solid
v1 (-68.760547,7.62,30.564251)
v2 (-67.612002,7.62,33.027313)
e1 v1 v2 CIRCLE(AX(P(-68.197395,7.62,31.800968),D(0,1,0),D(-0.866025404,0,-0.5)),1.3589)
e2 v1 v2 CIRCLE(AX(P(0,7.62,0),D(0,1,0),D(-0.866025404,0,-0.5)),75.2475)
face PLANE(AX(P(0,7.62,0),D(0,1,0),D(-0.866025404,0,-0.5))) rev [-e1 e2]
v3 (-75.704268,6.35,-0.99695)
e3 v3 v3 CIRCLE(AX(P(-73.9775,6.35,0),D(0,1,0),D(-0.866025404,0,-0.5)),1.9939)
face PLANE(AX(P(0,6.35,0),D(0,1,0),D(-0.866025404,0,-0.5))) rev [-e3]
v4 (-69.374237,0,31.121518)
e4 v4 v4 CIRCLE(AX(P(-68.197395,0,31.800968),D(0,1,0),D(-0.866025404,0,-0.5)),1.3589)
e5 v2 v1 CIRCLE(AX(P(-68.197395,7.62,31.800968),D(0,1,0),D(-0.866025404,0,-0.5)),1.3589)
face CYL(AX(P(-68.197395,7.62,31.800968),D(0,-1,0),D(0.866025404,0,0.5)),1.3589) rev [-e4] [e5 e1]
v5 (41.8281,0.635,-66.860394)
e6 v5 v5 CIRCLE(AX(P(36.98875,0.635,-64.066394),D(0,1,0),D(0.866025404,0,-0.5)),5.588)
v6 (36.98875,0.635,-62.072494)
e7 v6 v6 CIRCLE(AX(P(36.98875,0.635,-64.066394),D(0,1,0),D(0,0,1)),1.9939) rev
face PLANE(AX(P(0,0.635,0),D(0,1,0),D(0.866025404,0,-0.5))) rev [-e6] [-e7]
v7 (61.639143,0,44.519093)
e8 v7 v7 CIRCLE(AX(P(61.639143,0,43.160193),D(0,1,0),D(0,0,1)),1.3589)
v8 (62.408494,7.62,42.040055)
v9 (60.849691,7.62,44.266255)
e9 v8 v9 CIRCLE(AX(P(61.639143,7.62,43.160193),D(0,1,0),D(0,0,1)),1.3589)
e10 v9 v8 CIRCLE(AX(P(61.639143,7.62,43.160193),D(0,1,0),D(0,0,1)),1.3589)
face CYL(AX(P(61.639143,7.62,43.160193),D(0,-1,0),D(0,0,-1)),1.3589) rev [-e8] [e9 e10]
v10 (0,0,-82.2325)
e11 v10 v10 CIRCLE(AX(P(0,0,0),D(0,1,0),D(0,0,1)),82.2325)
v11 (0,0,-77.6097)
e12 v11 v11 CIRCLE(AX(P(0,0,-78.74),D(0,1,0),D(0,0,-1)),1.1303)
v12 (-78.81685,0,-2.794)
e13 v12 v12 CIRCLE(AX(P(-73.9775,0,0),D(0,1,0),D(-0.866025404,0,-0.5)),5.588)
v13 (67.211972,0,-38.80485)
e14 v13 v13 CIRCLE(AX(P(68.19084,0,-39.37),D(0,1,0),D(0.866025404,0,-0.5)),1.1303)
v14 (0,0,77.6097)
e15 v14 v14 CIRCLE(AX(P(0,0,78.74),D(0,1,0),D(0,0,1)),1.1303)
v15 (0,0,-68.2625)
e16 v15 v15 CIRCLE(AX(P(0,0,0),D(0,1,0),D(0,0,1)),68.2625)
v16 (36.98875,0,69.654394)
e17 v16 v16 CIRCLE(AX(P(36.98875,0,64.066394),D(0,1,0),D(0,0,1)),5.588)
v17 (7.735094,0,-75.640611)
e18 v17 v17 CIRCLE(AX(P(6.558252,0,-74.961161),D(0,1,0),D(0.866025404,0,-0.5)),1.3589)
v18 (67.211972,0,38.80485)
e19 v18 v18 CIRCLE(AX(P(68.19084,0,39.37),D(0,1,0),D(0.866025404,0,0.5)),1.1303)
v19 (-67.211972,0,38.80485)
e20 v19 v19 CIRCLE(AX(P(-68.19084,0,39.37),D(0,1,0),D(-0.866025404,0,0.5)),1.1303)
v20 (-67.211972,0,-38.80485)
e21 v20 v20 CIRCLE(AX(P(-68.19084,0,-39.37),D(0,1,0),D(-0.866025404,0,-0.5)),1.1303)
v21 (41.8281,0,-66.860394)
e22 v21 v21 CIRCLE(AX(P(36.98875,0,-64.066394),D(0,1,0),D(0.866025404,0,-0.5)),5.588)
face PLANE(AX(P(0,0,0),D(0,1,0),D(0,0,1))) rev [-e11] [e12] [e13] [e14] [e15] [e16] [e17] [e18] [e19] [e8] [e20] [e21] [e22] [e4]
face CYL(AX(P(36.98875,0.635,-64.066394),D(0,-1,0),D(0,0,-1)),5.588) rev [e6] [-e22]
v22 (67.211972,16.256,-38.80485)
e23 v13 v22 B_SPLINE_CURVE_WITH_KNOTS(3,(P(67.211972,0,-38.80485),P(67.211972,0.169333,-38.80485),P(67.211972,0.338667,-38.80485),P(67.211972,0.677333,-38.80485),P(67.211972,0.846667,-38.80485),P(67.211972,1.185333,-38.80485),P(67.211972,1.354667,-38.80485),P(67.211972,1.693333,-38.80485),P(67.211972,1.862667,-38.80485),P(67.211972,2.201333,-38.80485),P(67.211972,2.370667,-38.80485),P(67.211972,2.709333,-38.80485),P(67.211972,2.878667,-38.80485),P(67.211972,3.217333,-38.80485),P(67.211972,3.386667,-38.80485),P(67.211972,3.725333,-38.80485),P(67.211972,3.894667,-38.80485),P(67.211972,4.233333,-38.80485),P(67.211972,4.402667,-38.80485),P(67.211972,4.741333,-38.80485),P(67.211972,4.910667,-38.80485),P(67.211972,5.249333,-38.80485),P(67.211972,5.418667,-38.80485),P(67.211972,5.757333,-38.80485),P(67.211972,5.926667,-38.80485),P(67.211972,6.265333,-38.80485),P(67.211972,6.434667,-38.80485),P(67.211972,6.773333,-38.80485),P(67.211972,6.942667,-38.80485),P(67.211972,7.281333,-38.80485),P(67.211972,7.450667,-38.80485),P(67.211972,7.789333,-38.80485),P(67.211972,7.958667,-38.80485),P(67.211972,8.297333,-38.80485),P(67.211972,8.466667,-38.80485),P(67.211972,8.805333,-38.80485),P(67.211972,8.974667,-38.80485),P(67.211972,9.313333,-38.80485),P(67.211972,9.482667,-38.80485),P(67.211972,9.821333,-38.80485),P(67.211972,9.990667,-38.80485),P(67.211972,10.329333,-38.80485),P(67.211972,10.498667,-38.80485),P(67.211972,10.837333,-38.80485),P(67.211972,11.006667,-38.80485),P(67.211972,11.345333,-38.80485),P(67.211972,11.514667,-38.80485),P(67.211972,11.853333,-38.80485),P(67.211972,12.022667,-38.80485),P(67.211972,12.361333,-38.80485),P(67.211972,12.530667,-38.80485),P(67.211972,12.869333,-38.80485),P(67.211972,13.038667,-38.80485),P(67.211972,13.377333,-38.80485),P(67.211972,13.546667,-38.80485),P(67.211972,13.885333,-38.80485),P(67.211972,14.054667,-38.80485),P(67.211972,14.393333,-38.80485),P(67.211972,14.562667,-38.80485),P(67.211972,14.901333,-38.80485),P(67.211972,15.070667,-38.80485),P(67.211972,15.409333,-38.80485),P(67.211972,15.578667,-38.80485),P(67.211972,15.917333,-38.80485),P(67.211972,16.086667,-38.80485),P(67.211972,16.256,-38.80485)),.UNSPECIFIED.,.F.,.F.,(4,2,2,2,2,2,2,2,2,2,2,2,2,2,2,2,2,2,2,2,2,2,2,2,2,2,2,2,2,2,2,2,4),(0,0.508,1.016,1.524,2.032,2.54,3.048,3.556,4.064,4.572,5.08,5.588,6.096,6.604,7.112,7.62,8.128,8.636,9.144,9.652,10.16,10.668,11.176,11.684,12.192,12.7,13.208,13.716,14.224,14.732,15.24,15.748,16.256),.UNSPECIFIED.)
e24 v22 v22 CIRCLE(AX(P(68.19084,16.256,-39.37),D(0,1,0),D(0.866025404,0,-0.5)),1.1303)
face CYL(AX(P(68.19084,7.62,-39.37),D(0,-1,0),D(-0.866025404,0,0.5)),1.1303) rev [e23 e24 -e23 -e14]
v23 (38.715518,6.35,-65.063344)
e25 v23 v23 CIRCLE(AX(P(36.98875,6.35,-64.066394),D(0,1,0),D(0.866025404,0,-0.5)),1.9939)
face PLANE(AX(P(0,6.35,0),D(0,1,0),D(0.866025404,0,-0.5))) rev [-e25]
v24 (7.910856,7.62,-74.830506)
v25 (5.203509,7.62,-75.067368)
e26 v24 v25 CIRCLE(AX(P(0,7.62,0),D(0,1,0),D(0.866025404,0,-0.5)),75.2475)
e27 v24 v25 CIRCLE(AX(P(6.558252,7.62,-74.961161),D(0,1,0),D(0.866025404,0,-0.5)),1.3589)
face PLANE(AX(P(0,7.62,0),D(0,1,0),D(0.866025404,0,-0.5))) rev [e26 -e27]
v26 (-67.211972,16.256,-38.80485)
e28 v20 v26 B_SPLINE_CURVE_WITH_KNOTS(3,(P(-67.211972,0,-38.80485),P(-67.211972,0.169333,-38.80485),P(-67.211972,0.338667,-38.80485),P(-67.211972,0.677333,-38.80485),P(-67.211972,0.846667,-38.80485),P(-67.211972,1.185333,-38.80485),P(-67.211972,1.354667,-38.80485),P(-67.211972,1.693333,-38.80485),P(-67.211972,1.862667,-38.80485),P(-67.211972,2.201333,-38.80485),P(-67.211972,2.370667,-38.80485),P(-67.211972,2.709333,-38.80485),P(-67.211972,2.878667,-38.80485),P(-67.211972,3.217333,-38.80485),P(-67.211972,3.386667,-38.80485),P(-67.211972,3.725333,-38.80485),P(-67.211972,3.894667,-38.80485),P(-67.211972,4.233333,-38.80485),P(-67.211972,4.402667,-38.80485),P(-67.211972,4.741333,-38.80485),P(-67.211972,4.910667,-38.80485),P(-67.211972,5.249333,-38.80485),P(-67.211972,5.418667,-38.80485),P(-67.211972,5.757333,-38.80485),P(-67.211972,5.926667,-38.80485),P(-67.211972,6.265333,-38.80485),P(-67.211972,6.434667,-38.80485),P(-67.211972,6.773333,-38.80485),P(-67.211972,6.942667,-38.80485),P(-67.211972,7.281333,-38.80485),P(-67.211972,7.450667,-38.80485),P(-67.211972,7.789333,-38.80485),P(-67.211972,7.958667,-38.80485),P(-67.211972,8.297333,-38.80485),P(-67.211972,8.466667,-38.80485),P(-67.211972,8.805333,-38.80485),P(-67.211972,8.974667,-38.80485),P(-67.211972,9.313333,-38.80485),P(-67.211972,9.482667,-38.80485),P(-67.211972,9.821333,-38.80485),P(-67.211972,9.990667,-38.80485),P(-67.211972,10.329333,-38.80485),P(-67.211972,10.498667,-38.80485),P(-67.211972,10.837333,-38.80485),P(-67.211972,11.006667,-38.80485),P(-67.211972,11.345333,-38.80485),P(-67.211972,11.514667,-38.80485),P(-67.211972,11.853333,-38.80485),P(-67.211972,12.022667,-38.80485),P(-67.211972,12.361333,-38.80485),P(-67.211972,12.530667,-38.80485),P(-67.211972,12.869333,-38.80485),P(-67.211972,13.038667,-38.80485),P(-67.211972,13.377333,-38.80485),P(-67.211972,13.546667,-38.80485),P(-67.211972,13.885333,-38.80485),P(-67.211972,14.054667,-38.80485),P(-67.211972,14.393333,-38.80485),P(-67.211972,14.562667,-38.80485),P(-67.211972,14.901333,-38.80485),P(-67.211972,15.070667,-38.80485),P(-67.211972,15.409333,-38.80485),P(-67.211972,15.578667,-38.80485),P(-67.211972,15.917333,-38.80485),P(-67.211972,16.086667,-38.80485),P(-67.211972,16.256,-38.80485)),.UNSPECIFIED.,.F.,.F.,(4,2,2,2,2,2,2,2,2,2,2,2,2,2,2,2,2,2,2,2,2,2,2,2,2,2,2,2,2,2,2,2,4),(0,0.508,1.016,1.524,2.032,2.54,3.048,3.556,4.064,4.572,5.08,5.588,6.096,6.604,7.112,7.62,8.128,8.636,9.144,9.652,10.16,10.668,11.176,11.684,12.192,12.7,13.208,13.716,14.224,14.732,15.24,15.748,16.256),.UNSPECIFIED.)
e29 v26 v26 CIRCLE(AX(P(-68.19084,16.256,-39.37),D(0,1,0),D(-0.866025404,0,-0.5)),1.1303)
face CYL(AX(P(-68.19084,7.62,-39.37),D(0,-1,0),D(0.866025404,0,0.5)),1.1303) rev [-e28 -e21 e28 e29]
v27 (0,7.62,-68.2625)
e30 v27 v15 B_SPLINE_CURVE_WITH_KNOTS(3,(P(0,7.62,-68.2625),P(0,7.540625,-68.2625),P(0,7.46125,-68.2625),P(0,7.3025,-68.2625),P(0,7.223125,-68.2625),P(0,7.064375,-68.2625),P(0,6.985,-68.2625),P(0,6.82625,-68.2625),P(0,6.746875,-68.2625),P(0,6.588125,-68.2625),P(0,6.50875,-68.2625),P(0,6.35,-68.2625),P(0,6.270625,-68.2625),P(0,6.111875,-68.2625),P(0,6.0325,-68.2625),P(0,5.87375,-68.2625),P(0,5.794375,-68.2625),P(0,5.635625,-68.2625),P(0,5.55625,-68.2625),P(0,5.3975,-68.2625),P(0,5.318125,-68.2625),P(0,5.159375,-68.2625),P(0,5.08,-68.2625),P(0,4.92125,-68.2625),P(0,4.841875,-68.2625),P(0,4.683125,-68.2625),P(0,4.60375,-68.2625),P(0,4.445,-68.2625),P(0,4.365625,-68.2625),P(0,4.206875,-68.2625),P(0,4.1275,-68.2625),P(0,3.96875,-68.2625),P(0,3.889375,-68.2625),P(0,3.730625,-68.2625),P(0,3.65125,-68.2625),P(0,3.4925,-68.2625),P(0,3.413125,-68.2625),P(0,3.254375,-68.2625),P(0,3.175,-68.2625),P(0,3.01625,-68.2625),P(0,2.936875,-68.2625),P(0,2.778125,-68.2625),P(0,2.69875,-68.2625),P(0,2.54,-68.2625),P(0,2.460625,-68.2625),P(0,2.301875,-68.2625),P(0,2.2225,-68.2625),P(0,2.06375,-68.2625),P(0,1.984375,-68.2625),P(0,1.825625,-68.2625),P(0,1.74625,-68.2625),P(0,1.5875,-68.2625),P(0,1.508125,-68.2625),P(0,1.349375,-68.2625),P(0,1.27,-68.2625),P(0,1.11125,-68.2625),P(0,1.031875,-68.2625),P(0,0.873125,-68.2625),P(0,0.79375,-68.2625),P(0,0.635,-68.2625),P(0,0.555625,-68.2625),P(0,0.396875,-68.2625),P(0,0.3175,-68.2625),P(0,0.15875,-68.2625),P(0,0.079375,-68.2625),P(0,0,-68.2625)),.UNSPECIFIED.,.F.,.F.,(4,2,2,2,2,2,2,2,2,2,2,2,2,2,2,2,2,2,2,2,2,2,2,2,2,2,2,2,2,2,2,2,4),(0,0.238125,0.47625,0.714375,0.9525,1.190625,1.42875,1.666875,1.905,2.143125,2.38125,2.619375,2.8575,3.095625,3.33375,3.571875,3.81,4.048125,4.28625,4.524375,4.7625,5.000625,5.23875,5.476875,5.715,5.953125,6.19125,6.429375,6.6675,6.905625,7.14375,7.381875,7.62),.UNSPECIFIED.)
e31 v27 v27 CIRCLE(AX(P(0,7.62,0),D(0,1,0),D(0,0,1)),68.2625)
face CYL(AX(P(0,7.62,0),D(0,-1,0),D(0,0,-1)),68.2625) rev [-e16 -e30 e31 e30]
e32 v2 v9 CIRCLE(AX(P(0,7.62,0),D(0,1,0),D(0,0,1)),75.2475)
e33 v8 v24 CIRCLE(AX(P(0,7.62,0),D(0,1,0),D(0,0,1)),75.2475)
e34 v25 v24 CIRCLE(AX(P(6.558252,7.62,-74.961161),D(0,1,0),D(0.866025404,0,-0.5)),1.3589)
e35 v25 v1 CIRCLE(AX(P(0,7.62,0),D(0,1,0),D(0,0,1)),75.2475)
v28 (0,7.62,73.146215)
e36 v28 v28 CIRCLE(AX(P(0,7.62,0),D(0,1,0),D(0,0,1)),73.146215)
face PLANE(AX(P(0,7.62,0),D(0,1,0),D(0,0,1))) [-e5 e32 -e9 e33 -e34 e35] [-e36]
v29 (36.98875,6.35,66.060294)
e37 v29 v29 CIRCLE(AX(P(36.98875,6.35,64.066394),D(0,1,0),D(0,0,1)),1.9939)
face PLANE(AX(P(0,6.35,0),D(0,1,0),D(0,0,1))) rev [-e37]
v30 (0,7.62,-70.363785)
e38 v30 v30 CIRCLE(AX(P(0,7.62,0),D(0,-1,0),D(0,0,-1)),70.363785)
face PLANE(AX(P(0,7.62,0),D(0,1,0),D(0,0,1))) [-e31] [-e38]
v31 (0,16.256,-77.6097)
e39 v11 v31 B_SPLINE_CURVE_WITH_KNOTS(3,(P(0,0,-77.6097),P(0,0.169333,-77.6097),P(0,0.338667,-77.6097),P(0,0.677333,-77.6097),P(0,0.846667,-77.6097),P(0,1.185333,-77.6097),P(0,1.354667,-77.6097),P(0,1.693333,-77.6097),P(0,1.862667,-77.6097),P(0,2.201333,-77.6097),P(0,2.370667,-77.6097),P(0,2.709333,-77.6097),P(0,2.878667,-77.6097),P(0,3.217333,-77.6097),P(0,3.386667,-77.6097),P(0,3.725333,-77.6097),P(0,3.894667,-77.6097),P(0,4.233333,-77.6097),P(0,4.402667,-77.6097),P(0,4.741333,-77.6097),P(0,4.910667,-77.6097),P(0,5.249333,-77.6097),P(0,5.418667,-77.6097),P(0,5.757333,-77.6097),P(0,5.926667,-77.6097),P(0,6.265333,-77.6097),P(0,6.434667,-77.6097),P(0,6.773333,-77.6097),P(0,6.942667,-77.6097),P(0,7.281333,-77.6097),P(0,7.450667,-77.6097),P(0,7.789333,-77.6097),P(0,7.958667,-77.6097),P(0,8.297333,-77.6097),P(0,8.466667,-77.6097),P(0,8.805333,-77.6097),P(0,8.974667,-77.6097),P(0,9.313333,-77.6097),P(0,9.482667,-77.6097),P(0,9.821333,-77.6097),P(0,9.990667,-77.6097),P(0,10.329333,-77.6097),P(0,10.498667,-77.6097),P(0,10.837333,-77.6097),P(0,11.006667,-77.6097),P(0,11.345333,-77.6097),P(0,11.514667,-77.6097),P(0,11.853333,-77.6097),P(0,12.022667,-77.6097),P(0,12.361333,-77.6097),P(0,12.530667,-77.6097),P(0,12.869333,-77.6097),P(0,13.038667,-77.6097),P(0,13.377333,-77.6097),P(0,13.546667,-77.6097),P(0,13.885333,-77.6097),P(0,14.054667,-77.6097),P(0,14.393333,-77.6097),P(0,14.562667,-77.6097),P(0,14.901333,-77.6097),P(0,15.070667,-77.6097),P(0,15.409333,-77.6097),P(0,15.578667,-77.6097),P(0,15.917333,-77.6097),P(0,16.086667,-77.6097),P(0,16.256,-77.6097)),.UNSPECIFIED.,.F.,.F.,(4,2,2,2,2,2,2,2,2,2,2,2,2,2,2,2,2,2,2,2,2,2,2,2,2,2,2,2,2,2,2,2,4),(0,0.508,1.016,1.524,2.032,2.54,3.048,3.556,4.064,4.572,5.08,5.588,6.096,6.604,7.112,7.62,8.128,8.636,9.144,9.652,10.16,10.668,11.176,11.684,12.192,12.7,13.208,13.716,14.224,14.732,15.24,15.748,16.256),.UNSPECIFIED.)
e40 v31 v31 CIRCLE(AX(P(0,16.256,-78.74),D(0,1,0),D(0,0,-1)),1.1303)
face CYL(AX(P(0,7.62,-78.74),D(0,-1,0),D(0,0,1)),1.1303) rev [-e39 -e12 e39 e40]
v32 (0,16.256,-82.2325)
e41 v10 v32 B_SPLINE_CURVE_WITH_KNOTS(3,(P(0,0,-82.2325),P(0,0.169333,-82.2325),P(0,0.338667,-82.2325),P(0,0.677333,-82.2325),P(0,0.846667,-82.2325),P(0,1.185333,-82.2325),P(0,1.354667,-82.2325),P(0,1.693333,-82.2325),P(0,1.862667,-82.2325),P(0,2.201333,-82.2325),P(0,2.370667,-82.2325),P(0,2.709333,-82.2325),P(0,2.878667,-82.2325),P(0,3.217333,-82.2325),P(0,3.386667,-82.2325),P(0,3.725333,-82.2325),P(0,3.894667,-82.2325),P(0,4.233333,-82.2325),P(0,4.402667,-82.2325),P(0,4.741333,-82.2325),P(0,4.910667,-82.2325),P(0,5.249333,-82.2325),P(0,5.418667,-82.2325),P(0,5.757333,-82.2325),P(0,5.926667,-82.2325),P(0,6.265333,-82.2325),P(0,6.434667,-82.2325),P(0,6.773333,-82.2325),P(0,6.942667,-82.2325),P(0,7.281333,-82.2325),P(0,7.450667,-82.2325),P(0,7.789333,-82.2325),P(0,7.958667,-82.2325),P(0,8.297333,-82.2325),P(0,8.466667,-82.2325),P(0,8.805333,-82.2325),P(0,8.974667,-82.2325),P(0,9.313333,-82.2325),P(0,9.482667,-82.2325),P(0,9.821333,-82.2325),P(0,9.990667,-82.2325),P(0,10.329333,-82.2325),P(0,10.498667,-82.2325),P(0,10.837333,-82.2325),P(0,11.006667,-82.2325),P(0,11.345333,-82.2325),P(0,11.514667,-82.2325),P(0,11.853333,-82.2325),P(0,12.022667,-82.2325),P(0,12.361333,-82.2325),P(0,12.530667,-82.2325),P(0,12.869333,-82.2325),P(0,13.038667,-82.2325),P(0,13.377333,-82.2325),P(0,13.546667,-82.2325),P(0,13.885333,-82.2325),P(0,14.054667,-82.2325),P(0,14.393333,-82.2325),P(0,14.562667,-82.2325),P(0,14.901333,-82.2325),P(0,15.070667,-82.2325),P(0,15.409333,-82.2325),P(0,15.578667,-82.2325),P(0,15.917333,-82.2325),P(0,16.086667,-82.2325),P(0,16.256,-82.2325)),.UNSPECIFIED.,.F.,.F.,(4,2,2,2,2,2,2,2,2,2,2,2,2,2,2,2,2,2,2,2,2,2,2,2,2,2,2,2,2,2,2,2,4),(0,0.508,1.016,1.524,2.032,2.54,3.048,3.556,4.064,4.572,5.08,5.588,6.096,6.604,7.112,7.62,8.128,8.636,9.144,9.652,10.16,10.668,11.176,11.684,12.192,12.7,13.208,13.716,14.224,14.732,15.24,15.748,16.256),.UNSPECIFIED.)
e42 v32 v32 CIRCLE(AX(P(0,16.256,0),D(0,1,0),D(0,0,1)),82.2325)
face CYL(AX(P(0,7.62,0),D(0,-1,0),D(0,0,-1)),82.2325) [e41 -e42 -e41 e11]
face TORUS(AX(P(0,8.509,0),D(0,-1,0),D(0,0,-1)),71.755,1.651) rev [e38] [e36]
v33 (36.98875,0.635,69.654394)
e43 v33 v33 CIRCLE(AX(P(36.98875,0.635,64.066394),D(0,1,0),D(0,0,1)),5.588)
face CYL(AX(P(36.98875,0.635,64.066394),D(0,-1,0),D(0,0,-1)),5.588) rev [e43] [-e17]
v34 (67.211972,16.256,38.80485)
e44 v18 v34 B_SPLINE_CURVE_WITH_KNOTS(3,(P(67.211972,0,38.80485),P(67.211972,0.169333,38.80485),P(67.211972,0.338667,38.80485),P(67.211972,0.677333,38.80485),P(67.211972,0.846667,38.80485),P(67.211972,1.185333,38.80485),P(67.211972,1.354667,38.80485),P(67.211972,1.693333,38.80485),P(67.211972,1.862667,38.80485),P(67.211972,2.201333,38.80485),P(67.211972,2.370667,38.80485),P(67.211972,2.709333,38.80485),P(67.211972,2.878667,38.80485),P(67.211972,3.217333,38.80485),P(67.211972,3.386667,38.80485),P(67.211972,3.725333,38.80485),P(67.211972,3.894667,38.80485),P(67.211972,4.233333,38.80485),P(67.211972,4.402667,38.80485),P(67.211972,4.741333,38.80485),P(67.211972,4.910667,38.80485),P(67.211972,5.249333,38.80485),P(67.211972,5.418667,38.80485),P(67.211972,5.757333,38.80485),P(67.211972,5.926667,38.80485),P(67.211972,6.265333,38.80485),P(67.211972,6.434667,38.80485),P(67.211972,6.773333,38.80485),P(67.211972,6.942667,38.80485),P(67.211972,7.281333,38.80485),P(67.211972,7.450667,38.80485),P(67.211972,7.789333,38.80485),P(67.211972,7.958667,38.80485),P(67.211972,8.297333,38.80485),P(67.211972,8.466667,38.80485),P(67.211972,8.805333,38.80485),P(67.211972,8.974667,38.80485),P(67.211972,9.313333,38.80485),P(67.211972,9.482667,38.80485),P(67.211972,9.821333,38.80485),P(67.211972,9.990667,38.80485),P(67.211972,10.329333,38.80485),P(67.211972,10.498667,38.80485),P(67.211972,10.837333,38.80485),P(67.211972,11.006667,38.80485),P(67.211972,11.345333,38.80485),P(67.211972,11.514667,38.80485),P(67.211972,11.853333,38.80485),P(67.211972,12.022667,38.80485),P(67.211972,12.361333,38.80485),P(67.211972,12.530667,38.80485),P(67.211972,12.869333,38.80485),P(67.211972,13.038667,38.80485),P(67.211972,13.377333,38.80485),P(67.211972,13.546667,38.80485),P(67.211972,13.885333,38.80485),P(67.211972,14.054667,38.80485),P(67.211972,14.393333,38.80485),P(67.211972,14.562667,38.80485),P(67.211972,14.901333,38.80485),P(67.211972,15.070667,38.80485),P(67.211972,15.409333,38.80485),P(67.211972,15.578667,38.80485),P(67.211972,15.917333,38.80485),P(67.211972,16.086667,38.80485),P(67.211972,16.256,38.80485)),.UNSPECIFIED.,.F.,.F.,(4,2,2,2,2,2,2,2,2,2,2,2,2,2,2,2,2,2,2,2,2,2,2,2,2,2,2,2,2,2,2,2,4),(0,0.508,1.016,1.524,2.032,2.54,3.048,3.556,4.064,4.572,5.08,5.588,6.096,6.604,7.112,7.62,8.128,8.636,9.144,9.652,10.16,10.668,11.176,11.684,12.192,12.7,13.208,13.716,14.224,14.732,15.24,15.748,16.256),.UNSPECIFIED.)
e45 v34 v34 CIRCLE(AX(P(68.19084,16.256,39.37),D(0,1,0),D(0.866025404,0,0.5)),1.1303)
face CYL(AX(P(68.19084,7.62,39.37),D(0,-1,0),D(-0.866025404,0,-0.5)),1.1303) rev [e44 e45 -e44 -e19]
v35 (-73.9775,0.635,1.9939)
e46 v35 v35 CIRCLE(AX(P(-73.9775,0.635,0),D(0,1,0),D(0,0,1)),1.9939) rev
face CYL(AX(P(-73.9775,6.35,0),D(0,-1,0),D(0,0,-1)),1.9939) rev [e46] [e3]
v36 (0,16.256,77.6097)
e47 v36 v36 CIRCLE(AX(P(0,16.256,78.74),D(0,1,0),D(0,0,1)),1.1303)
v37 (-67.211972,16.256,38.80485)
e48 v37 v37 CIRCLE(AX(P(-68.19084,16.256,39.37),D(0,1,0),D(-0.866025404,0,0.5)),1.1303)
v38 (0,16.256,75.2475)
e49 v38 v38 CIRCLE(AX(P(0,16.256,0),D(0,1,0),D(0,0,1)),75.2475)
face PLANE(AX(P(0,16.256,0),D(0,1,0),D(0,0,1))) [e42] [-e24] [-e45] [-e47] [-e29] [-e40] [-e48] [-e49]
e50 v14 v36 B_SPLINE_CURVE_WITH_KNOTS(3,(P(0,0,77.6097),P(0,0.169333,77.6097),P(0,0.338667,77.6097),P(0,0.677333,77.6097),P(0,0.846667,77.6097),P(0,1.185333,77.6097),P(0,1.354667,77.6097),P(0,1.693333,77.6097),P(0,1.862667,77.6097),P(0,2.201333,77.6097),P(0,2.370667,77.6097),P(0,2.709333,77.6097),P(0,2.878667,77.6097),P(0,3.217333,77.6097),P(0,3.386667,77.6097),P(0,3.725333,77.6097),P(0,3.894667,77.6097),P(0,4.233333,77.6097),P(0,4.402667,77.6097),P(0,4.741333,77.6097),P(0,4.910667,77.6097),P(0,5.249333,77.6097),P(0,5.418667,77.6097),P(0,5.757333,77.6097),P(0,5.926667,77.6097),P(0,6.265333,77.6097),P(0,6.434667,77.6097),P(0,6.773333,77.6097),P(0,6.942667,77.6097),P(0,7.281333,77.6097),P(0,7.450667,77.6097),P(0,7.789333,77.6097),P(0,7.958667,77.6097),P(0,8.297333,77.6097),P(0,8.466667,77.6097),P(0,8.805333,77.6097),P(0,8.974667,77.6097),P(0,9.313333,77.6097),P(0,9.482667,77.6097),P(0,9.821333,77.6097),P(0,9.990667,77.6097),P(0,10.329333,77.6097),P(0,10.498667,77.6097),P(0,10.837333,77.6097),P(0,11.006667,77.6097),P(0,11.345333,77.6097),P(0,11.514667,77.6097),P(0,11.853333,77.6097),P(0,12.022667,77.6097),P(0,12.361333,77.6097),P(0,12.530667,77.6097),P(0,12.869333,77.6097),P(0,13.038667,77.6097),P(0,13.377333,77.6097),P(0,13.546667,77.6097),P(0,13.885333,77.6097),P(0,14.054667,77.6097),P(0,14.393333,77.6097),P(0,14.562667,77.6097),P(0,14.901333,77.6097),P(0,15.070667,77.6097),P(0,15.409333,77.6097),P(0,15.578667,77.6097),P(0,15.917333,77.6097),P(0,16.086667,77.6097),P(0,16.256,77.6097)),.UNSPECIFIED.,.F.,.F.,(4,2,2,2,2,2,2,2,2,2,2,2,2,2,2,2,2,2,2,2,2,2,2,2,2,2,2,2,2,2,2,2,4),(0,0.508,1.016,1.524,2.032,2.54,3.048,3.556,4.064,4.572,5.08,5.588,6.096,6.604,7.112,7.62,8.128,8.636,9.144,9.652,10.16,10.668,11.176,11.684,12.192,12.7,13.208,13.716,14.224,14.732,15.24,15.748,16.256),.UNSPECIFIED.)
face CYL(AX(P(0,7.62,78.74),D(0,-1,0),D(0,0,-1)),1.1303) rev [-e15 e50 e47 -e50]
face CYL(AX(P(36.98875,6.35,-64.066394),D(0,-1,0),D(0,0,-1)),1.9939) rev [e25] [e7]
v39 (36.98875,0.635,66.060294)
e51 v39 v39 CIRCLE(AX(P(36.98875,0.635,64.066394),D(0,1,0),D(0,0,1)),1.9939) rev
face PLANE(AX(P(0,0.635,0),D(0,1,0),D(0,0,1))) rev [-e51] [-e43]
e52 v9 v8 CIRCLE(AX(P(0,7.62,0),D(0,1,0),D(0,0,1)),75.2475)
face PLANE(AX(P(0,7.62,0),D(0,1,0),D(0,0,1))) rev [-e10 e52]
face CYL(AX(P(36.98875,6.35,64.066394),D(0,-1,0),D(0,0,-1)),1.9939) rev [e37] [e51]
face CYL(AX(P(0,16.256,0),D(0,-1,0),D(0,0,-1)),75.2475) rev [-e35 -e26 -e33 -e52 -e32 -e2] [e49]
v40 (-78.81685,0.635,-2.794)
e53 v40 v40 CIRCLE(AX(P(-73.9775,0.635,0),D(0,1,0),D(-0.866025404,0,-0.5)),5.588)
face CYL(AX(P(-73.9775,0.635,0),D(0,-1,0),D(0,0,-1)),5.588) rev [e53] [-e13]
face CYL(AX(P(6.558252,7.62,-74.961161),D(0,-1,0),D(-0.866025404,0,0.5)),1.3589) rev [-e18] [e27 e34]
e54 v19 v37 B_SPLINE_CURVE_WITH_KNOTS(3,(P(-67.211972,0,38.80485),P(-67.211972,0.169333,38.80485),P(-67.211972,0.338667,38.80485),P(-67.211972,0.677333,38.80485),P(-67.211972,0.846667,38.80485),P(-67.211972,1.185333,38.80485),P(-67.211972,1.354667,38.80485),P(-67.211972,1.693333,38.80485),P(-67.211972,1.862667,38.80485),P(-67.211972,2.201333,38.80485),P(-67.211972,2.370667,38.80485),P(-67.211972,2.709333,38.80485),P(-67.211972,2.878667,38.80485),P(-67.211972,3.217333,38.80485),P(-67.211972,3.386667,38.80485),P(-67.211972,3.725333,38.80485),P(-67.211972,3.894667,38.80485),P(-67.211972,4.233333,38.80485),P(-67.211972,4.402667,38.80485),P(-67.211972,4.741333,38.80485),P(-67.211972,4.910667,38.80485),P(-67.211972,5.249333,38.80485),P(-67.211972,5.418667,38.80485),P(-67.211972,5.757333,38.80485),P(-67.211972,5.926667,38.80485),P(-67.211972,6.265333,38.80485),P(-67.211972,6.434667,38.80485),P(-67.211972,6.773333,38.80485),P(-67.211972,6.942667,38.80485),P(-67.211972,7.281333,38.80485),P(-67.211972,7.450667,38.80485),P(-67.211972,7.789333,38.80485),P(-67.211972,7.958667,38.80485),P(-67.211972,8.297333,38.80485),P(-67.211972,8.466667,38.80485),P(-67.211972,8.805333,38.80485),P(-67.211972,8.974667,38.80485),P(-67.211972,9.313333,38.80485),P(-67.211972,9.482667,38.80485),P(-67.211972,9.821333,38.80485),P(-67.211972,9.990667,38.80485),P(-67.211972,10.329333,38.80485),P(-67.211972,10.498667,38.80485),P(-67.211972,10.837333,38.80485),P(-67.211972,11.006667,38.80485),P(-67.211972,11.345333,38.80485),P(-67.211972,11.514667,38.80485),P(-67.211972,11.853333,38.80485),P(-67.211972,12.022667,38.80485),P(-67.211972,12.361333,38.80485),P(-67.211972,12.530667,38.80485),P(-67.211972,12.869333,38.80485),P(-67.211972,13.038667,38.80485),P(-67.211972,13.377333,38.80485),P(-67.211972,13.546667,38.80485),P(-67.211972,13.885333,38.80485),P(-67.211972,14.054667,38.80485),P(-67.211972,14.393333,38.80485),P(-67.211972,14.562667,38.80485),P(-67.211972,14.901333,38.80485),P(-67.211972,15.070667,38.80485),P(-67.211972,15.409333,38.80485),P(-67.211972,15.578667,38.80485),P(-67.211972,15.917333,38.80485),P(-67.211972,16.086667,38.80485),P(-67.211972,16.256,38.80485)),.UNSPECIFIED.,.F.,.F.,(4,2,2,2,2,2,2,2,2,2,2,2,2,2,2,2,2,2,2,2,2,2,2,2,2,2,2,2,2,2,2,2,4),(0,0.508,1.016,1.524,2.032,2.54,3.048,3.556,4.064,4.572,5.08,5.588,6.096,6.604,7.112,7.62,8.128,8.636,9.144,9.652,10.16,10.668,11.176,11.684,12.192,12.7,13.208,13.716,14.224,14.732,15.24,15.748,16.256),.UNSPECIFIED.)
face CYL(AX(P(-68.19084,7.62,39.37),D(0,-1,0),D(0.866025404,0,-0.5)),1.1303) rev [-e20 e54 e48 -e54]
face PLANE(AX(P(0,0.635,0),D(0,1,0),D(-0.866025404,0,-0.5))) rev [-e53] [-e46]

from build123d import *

# Parameters (mm, degrees)
SKETCH1_R                 = 82.2325
SKETCH1_R_2               = 68.2625
SKETCH1_R_3               = 1.1303
SKETCH1_R_4               = 1.3589
BOSS_EXTRUDE1_DEPTH       = 7.62
BOSS_EXTRUDE3_START       = 7.62
SKETCH1_3_R               = 82.2325
SKETCH1_3_R_2             = 1.1303
SKETCH1_3_R_3             = 75.2475
BOSS_EXTRUDE3_DEPTH       = 8.636
CIRPATTERN1_OUTLINE_R     = 1.1303
CIRPATTERN1_DEPTH         = 16.256
SKETCH2_R                 = 1.651
SKETCH1_4_R               = 5.588
SKETCH1_4_R_2             = 1.9939
CUT_EXTRUDE2_DEPTH        = 0.635
SKETCH1_5_R               = 1.9939
CUT_EXTRUDE3_DEPTH        = 6.35
CIRPATTERN3_OUTLINE_R     = 1.3589
CIRPATTERN3_OUTLINE_R_2   = 1.9939
CIRPATTERN3_DEPTH         = 6.35
CIRPATTERN3_2_OUTLINE_R   = 5.588
CIRPATTERN3_2_OUTLINE_R_2 = 1.9939
CIRPATTERN3_2_DEPTH       = 0.635
CIRPATTERN3_START         = 6.35
CIRPATTERN3_3_OUTLINE_R   = 1.3589
CIRPATTERN3_3_DEPTH       = 1.27


# Read off the part's stored shape, not the designer's step: CirPattern1, CirPattern3
with BuildPart() as part:
    # Sketch1 → Boss-Extrude1 (new body)
    with BuildSketch(Plane(origin=(0, 0, 0), x_dir=(1, 0, 0), z_dir=(0, 1, 0))):
        with Locations(Location((0, 0, 0), (0, 0, 90))):
            Circle(SKETCH1_R)
        with Locations(Location((0, 0, 0), (0, 0, 90))):
            Circle(SKETCH1_R_2, mode=Mode.SUBTRACT)
        with Locations(Location((0, -78.74, 0), (0, 0, 90))):
            Circle(SKETCH1_R_3, mode=Mode.SUBTRACT)
        with Locations(Location((61.639143453, -43.160192894, 0), (0, 0, 90))):
            Circle(SKETCH1_R_4, mode=Mode.SUBTRACT)
    extrude(amount=BOSS_EXTRUDE1_DEPTH)

    # Sketch1<3> → Boss-Extrude3 (add)
    with BuildSketch(Plane(origin=(0, 0, 0), x_dir=(1, 0, 0), z_dir=(0, 1, 0)).offset(BOSS_EXTRUDE3_START)):
        with Locations(Location((0, 0, 0), (0, 0, 90))):
            Circle(SKETCH1_3_R)
        with Locations(Location((0, -78.74, 0), (0, 0, 90))):
            Circle(SKETCH1_3_R_2, mode=Mode.SUBTRACT)
        with Locations(Location((0, 0, 0), (0, 0, 326.034722653))):
            Circle(SKETCH1_3_R_3, mode=Mode.SUBTRACT)
    extrude(amount=BOSS_EXTRUDE3_DEPTH)

    # CirPattern1 outline → CirPattern1 (cut)
    with BuildSketch(Plane(origin=(0, 0, 0), x_dir=(1, 0, 0), z_dir=(0, 1, 0))):
        with Locations((-68.190840294, -39.37)):
            Circle(CIRPATTERN1_OUTLINE_R)
        with Locations((-68.190840294, 39.37)):
            Circle(CIRPATTERN1_OUTLINE_R)
        with Locations((0, 78.74)):
            Circle(CIRPATTERN1_OUTLINE_R)
        with Locations((68.190840294, 39.37)):
            Circle(CIRPATTERN1_OUTLINE_R)
        with Locations((68.190840294, -39.37)):
            Circle(CIRPATTERN1_OUTLINE_R)
    extrude(amount=CIRPATTERN1_DEPTH, mode=Mode.SUBTRACT)

    # Sketch2 → Cut-Revolve2 (revolve, cut)
    with BuildSketch(Plane(origin=(0, 0, 0), x_dir=(0, 0, -1), z_dir=(1, 0, 0))):
        with Locations((71.755, 8.509)):
            Circle(SKETCH2_R)
    revolve(axis=Axis((0, 7.62, 0), (0, 1, 0)), mode=Mode.SUBTRACT)

    # Sketch1<4> → Cut-Extrude2 (cut)
    with BuildSketch(Plane(origin=(0, 0, 0), x_dir=(1, 0, 0), z_dir=(0, 1, 0))):
        with Locations(Location((36.98875, -64.066394308, 0), (0, 0, 270))):
            Circle(SKETCH1_4_R)
        with Locations(Location((36.98875, -64.066394308, 0), (0, 0, 270))):
            Circle(SKETCH1_4_R_2, mode=Mode.SUBTRACT)
    extrude(amount=CUT_EXTRUDE2_DEPTH, mode=Mode.SUBTRACT)

    # Sketch1<5> → Cut-Extrude3 (cut)
    with BuildSketch(Plane(origin=(0, 0, 0), x_dir=(1, 0, 0), z_dir=(0, 1, 0))):
        with Locations(Location((36.98875, -64.066394308, 0), (0, 0, 270))):
            Circle(SKETCH1_5_R)
    extrude(amount=CUT_EXTRUDE3_DEPTH, mode=Mode.SUBTRACT)

    # CirPattern3 outline → CirPattern3 (cut)
    with BuildSketch(Plane(origin=(0, 0, 0), x_dir=(1, 0, 0), z_dir=(0, 1, 0))):
        with Locations((-68.197395205, -31.80096765)):
            Circle(CIRPATTERN3_OUTLINE_R)
        with Locations((6.558251752, 74.961160545)):
            Circle(CIRPATTERN3_OUTLINE_R)
        with Locations((36.98875, 64.066394308)):
            Circle(CIRPATTERN3_OUTLINE_R_2)
        with Locations((-73.9775, 0)):
            Circle(CIRPATTERN3_OUTLINE_R_2)
    extrude(amount=CIRPATTERN3_DEPTH, mode=Mode.SUBTRACT)

    # CirPattern3 2 outline → CirPattern3 2 (cut)
    # profile 1 of 2: a face of its own
    with BuildSketch(Plane(origin=(0, 0, 0), x_dir=(1, 0, 0), z_dir=(0, 1, 0))):
        with Locations((-73.9775, 0)):
            Circle(CIRPATTERN3_2_OUTLINE_R)
        with Locations((-73.9775, 0)):
            Circle(CIRPATTERN3_2_OUTLINE_R_2, mode=Mode.SUBTRACT)
    # profile 2 of 2: a face of its own
    with BuildSketch(Plane(origin=(0, 0, 0), x_dir=(1, 0, 0), z_dir=(0, 1, 0))):
        with Locations((36.98875, 64.066394308)):
            Circle(CIRPATTERN3_2_OUTLINE_R)
        with Locations((36.98875, 64.066394308)):
            Circle(CIRPATTERN3_2_OUTLINE_R_2, mode=Mode.SUBTRACT)
    extrude(amount=CIRPATTERN3_2_DEPTH, mode=Mode.SUBTRACT)

    # CirPattern3 3 outline → CirPattern3 3 (cut)
    with BuildSketch(Plane(origin=(0, 0, 0), x_dir=(1, 0, 0), z_dir=(0, 1, 0)).offset(CIRPATTERN3_START)):
        with Locations((-68.197395205, -31.80096765)):
            Circle(CIRPATTERN3_3_OUTLINE_R)
        with Locations((6.558251752, 74.961160545)):
            Circle(CIRPATTERN3_3_OUTLINE_R)
    extrude(amount=CIRPATTERN3_3_DEPTH, mode=Mode.SUBTRACT)


solid = part.part
